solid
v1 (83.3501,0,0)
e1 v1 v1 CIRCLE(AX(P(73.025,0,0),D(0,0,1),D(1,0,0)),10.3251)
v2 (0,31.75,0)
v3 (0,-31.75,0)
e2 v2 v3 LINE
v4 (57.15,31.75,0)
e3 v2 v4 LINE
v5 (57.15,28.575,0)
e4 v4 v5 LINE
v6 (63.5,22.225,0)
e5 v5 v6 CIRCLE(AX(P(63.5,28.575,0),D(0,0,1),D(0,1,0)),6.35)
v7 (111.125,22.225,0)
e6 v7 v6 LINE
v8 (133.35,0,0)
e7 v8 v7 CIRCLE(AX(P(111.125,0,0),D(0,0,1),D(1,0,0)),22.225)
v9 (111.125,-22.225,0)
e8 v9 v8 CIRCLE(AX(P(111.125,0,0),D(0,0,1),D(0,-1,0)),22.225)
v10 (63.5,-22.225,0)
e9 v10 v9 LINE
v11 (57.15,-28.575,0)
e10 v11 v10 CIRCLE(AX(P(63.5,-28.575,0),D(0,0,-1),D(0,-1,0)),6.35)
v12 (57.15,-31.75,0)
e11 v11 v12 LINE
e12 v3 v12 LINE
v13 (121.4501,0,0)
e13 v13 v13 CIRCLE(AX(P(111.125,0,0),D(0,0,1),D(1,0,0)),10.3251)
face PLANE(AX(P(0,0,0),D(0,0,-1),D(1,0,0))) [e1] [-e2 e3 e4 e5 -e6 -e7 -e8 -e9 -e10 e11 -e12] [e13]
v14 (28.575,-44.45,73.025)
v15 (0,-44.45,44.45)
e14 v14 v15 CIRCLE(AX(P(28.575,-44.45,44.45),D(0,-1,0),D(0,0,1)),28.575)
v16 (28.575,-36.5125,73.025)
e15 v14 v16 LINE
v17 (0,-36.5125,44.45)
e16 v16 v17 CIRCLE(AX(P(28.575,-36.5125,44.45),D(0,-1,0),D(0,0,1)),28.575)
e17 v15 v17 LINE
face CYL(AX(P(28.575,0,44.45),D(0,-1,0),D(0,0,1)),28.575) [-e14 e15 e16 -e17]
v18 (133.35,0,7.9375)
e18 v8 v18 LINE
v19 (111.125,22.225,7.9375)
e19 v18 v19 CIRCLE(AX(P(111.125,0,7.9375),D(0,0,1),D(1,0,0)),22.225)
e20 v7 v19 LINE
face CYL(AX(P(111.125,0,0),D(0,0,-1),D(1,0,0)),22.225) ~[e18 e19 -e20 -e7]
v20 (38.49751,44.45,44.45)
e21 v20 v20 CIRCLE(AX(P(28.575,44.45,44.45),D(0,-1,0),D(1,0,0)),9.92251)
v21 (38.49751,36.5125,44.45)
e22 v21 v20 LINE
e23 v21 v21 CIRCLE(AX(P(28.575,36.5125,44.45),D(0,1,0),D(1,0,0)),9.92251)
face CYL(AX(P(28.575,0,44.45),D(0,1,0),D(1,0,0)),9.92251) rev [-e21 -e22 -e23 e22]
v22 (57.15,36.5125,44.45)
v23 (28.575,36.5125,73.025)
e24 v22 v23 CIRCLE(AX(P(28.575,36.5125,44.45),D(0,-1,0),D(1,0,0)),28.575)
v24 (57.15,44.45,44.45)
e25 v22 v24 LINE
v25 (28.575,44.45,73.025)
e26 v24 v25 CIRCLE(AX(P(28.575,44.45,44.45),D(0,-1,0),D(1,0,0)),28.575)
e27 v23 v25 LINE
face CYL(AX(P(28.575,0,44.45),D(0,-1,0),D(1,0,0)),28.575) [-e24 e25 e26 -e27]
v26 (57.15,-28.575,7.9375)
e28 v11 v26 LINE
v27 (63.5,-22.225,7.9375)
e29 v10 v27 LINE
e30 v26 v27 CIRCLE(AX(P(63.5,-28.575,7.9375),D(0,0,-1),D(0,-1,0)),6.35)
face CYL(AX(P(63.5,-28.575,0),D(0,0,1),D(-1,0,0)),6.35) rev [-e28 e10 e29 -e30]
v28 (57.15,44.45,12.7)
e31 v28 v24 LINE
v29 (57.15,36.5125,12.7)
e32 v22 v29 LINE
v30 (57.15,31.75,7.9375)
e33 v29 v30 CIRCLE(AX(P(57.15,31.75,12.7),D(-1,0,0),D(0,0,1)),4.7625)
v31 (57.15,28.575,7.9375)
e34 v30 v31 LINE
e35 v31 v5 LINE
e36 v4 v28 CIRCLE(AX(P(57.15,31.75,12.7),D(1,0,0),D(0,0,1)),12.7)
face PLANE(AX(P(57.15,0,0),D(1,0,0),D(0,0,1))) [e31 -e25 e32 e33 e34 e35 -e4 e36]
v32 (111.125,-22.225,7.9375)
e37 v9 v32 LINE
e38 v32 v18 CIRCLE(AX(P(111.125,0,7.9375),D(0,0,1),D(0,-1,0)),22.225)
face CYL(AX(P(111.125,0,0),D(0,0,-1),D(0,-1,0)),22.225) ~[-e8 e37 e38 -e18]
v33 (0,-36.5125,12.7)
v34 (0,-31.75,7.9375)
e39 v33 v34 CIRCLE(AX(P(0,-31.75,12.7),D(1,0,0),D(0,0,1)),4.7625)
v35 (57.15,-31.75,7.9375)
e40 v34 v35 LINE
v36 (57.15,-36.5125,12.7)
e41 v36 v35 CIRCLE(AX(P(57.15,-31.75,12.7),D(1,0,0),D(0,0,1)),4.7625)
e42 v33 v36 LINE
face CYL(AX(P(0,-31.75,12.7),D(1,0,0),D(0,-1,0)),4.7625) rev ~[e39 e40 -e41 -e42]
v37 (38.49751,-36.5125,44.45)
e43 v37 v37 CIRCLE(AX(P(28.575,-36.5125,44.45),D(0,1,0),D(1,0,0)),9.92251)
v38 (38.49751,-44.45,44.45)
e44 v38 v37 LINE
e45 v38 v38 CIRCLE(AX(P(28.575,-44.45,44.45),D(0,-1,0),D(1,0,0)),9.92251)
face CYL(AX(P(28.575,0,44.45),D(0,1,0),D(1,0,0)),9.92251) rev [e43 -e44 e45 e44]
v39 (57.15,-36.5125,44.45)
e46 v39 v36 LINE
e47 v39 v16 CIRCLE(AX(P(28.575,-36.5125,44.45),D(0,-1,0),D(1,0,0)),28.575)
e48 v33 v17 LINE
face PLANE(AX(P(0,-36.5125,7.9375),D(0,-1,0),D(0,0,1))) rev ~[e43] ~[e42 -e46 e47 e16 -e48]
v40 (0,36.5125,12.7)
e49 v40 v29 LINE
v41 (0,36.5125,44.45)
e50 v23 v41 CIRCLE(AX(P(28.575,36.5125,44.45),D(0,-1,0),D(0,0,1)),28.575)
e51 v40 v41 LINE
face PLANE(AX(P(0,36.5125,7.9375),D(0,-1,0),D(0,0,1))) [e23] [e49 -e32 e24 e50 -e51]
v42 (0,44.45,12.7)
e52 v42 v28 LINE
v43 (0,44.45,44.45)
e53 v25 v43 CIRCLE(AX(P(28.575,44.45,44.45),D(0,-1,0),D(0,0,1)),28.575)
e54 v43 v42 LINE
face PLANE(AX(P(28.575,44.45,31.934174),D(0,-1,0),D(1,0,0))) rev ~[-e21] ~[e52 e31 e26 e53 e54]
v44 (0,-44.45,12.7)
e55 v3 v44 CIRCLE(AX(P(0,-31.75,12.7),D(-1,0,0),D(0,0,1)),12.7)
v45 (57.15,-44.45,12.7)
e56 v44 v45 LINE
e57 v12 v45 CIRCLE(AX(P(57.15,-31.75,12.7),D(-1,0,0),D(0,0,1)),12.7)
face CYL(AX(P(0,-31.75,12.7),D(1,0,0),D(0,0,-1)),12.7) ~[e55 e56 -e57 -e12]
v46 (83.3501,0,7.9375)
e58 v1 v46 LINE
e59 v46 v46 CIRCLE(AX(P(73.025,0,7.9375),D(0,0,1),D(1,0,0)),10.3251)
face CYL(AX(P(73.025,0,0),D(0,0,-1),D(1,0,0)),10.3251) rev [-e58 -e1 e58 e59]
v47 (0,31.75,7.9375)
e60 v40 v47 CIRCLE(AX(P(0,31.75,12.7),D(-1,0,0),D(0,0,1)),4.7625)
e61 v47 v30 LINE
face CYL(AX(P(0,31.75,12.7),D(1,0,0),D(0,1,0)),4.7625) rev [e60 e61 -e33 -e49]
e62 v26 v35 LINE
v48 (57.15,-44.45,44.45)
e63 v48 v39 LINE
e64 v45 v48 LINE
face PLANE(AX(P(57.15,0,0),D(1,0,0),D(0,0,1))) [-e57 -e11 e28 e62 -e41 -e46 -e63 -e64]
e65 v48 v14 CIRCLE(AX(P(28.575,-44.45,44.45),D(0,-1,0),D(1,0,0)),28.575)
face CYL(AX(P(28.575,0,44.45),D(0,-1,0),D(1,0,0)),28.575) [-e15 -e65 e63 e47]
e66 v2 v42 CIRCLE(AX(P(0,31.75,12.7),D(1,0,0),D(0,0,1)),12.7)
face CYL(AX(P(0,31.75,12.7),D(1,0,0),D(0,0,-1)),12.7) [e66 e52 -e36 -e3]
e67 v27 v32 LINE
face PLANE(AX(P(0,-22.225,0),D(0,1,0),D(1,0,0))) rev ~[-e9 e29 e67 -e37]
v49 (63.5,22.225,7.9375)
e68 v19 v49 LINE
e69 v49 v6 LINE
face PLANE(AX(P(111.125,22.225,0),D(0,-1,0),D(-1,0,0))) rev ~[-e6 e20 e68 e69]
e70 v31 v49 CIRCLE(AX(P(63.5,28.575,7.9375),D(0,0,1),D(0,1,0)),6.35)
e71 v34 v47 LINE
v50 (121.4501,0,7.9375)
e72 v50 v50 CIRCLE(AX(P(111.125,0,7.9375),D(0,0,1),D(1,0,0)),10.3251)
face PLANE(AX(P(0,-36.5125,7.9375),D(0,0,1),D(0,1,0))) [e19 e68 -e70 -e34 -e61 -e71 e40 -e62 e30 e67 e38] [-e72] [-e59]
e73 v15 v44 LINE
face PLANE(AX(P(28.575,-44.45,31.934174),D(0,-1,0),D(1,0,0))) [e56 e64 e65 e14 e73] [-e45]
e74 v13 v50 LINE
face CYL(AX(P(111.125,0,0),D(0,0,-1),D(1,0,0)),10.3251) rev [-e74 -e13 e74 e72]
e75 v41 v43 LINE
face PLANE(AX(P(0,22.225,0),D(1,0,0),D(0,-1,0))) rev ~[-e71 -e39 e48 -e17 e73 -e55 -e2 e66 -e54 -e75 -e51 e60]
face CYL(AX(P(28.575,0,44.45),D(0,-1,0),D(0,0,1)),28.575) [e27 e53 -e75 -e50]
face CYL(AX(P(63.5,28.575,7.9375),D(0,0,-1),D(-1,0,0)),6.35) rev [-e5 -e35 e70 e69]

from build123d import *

# Parameters (mm, degrees)
F0_R     = 9.92251
F1_DEPTH = 44.45
F2_R     = 10.3251
F3_DEPTH = 7.9375
F4_W     = 73.025
F4_H     = 76.2
F5_DEPTH = 133.351
F6_R     = 12.7
F7_R     = 4.7625
F8_R     = 6.35


with BuildPart() as f1:
    # F0 (on Front) → F1 (new body, symmetric)
    with BuildSketch(Plane.XZ):
        with BuildLine():
            Line((0, 44.45), (0, 0))
            Line((0, 0), (57.15, 0))
            Line((57.15, 0), (57.15, 44.45))
            ThreePointArc((57.15, 44.45), (48.7805762724, 64.6555762724), (28.575, 73.025))
            ThreePointArc((28.575, 73.025), (8.3694237276, 64.6555762724), (0, 44.45))
        make_face()
        with Locations((28.575, 44.45)):
            Circle(F0_R, mode=Mode.SUBTRACT)
    extrude(amount=F1_DEPTH, both=True)

    # F2 (on Top) → F3 (join)
    with BuildSketch(Plane.XY):
        with BuildLine():
            Line((0, 22.225), (0, -22.225))
            Line((0, -22.225), (111.125, -22.225))
            ThreePointArc((111.125, -22.225), (126.8404482119, -15.7154482119), (133.35, 0))
            ThreePointArc((133.35, 0), (126.8404482119, 15.7154482119), (111.125, 22.225))
            Line((111.125, 22.225), (0, 22.225))
        make_face()
        with Locations((73.025, 0)):
            Circle(F2_R, mode=Mode.SUBTRACT)
        with Locations((111.125, 0)):
            Circle(F2_R, mode=Mode.SUBTRACT)
    extrude(amount=F3_DEPTH)

    # F4 (on Right) → F5 (cut, through all)
    with BuildSketch(Plane.YZ):
        with Locations((0, 46.0375)):
            Rectangle(F4_W, F4_H)
    extrude(amount=F5_DEPTH, mode=Mode.SUBTRACT)

    # F6
    f6_edges = [f1.edges().sort_by_distance(p)[0] for p in [
        (28.575, -44.45, 0),
        (28.575, 44.45, 0),
    ]]
    fillet(f6_edges, radius=F6_R)

    # F7
    f7_edges = [f1.edges().sort_by_distance(p)[0] for p in [
        (28.575, 36.5125, 7.9375),
        (28.575, -36.5125, 7.9375),
    ]]
    fillet(f7_edges, radius=F7_R)

    # F8
    f8_edges = [f1.edges().sort_by_distance(p)[0] for p in [
        (57.15, 22.225, 3.96875),
        (57.15, -22.225, 3.96875),
    ]]
    fillet(f8_edges, radius=F8_R)


solid = f1.part
